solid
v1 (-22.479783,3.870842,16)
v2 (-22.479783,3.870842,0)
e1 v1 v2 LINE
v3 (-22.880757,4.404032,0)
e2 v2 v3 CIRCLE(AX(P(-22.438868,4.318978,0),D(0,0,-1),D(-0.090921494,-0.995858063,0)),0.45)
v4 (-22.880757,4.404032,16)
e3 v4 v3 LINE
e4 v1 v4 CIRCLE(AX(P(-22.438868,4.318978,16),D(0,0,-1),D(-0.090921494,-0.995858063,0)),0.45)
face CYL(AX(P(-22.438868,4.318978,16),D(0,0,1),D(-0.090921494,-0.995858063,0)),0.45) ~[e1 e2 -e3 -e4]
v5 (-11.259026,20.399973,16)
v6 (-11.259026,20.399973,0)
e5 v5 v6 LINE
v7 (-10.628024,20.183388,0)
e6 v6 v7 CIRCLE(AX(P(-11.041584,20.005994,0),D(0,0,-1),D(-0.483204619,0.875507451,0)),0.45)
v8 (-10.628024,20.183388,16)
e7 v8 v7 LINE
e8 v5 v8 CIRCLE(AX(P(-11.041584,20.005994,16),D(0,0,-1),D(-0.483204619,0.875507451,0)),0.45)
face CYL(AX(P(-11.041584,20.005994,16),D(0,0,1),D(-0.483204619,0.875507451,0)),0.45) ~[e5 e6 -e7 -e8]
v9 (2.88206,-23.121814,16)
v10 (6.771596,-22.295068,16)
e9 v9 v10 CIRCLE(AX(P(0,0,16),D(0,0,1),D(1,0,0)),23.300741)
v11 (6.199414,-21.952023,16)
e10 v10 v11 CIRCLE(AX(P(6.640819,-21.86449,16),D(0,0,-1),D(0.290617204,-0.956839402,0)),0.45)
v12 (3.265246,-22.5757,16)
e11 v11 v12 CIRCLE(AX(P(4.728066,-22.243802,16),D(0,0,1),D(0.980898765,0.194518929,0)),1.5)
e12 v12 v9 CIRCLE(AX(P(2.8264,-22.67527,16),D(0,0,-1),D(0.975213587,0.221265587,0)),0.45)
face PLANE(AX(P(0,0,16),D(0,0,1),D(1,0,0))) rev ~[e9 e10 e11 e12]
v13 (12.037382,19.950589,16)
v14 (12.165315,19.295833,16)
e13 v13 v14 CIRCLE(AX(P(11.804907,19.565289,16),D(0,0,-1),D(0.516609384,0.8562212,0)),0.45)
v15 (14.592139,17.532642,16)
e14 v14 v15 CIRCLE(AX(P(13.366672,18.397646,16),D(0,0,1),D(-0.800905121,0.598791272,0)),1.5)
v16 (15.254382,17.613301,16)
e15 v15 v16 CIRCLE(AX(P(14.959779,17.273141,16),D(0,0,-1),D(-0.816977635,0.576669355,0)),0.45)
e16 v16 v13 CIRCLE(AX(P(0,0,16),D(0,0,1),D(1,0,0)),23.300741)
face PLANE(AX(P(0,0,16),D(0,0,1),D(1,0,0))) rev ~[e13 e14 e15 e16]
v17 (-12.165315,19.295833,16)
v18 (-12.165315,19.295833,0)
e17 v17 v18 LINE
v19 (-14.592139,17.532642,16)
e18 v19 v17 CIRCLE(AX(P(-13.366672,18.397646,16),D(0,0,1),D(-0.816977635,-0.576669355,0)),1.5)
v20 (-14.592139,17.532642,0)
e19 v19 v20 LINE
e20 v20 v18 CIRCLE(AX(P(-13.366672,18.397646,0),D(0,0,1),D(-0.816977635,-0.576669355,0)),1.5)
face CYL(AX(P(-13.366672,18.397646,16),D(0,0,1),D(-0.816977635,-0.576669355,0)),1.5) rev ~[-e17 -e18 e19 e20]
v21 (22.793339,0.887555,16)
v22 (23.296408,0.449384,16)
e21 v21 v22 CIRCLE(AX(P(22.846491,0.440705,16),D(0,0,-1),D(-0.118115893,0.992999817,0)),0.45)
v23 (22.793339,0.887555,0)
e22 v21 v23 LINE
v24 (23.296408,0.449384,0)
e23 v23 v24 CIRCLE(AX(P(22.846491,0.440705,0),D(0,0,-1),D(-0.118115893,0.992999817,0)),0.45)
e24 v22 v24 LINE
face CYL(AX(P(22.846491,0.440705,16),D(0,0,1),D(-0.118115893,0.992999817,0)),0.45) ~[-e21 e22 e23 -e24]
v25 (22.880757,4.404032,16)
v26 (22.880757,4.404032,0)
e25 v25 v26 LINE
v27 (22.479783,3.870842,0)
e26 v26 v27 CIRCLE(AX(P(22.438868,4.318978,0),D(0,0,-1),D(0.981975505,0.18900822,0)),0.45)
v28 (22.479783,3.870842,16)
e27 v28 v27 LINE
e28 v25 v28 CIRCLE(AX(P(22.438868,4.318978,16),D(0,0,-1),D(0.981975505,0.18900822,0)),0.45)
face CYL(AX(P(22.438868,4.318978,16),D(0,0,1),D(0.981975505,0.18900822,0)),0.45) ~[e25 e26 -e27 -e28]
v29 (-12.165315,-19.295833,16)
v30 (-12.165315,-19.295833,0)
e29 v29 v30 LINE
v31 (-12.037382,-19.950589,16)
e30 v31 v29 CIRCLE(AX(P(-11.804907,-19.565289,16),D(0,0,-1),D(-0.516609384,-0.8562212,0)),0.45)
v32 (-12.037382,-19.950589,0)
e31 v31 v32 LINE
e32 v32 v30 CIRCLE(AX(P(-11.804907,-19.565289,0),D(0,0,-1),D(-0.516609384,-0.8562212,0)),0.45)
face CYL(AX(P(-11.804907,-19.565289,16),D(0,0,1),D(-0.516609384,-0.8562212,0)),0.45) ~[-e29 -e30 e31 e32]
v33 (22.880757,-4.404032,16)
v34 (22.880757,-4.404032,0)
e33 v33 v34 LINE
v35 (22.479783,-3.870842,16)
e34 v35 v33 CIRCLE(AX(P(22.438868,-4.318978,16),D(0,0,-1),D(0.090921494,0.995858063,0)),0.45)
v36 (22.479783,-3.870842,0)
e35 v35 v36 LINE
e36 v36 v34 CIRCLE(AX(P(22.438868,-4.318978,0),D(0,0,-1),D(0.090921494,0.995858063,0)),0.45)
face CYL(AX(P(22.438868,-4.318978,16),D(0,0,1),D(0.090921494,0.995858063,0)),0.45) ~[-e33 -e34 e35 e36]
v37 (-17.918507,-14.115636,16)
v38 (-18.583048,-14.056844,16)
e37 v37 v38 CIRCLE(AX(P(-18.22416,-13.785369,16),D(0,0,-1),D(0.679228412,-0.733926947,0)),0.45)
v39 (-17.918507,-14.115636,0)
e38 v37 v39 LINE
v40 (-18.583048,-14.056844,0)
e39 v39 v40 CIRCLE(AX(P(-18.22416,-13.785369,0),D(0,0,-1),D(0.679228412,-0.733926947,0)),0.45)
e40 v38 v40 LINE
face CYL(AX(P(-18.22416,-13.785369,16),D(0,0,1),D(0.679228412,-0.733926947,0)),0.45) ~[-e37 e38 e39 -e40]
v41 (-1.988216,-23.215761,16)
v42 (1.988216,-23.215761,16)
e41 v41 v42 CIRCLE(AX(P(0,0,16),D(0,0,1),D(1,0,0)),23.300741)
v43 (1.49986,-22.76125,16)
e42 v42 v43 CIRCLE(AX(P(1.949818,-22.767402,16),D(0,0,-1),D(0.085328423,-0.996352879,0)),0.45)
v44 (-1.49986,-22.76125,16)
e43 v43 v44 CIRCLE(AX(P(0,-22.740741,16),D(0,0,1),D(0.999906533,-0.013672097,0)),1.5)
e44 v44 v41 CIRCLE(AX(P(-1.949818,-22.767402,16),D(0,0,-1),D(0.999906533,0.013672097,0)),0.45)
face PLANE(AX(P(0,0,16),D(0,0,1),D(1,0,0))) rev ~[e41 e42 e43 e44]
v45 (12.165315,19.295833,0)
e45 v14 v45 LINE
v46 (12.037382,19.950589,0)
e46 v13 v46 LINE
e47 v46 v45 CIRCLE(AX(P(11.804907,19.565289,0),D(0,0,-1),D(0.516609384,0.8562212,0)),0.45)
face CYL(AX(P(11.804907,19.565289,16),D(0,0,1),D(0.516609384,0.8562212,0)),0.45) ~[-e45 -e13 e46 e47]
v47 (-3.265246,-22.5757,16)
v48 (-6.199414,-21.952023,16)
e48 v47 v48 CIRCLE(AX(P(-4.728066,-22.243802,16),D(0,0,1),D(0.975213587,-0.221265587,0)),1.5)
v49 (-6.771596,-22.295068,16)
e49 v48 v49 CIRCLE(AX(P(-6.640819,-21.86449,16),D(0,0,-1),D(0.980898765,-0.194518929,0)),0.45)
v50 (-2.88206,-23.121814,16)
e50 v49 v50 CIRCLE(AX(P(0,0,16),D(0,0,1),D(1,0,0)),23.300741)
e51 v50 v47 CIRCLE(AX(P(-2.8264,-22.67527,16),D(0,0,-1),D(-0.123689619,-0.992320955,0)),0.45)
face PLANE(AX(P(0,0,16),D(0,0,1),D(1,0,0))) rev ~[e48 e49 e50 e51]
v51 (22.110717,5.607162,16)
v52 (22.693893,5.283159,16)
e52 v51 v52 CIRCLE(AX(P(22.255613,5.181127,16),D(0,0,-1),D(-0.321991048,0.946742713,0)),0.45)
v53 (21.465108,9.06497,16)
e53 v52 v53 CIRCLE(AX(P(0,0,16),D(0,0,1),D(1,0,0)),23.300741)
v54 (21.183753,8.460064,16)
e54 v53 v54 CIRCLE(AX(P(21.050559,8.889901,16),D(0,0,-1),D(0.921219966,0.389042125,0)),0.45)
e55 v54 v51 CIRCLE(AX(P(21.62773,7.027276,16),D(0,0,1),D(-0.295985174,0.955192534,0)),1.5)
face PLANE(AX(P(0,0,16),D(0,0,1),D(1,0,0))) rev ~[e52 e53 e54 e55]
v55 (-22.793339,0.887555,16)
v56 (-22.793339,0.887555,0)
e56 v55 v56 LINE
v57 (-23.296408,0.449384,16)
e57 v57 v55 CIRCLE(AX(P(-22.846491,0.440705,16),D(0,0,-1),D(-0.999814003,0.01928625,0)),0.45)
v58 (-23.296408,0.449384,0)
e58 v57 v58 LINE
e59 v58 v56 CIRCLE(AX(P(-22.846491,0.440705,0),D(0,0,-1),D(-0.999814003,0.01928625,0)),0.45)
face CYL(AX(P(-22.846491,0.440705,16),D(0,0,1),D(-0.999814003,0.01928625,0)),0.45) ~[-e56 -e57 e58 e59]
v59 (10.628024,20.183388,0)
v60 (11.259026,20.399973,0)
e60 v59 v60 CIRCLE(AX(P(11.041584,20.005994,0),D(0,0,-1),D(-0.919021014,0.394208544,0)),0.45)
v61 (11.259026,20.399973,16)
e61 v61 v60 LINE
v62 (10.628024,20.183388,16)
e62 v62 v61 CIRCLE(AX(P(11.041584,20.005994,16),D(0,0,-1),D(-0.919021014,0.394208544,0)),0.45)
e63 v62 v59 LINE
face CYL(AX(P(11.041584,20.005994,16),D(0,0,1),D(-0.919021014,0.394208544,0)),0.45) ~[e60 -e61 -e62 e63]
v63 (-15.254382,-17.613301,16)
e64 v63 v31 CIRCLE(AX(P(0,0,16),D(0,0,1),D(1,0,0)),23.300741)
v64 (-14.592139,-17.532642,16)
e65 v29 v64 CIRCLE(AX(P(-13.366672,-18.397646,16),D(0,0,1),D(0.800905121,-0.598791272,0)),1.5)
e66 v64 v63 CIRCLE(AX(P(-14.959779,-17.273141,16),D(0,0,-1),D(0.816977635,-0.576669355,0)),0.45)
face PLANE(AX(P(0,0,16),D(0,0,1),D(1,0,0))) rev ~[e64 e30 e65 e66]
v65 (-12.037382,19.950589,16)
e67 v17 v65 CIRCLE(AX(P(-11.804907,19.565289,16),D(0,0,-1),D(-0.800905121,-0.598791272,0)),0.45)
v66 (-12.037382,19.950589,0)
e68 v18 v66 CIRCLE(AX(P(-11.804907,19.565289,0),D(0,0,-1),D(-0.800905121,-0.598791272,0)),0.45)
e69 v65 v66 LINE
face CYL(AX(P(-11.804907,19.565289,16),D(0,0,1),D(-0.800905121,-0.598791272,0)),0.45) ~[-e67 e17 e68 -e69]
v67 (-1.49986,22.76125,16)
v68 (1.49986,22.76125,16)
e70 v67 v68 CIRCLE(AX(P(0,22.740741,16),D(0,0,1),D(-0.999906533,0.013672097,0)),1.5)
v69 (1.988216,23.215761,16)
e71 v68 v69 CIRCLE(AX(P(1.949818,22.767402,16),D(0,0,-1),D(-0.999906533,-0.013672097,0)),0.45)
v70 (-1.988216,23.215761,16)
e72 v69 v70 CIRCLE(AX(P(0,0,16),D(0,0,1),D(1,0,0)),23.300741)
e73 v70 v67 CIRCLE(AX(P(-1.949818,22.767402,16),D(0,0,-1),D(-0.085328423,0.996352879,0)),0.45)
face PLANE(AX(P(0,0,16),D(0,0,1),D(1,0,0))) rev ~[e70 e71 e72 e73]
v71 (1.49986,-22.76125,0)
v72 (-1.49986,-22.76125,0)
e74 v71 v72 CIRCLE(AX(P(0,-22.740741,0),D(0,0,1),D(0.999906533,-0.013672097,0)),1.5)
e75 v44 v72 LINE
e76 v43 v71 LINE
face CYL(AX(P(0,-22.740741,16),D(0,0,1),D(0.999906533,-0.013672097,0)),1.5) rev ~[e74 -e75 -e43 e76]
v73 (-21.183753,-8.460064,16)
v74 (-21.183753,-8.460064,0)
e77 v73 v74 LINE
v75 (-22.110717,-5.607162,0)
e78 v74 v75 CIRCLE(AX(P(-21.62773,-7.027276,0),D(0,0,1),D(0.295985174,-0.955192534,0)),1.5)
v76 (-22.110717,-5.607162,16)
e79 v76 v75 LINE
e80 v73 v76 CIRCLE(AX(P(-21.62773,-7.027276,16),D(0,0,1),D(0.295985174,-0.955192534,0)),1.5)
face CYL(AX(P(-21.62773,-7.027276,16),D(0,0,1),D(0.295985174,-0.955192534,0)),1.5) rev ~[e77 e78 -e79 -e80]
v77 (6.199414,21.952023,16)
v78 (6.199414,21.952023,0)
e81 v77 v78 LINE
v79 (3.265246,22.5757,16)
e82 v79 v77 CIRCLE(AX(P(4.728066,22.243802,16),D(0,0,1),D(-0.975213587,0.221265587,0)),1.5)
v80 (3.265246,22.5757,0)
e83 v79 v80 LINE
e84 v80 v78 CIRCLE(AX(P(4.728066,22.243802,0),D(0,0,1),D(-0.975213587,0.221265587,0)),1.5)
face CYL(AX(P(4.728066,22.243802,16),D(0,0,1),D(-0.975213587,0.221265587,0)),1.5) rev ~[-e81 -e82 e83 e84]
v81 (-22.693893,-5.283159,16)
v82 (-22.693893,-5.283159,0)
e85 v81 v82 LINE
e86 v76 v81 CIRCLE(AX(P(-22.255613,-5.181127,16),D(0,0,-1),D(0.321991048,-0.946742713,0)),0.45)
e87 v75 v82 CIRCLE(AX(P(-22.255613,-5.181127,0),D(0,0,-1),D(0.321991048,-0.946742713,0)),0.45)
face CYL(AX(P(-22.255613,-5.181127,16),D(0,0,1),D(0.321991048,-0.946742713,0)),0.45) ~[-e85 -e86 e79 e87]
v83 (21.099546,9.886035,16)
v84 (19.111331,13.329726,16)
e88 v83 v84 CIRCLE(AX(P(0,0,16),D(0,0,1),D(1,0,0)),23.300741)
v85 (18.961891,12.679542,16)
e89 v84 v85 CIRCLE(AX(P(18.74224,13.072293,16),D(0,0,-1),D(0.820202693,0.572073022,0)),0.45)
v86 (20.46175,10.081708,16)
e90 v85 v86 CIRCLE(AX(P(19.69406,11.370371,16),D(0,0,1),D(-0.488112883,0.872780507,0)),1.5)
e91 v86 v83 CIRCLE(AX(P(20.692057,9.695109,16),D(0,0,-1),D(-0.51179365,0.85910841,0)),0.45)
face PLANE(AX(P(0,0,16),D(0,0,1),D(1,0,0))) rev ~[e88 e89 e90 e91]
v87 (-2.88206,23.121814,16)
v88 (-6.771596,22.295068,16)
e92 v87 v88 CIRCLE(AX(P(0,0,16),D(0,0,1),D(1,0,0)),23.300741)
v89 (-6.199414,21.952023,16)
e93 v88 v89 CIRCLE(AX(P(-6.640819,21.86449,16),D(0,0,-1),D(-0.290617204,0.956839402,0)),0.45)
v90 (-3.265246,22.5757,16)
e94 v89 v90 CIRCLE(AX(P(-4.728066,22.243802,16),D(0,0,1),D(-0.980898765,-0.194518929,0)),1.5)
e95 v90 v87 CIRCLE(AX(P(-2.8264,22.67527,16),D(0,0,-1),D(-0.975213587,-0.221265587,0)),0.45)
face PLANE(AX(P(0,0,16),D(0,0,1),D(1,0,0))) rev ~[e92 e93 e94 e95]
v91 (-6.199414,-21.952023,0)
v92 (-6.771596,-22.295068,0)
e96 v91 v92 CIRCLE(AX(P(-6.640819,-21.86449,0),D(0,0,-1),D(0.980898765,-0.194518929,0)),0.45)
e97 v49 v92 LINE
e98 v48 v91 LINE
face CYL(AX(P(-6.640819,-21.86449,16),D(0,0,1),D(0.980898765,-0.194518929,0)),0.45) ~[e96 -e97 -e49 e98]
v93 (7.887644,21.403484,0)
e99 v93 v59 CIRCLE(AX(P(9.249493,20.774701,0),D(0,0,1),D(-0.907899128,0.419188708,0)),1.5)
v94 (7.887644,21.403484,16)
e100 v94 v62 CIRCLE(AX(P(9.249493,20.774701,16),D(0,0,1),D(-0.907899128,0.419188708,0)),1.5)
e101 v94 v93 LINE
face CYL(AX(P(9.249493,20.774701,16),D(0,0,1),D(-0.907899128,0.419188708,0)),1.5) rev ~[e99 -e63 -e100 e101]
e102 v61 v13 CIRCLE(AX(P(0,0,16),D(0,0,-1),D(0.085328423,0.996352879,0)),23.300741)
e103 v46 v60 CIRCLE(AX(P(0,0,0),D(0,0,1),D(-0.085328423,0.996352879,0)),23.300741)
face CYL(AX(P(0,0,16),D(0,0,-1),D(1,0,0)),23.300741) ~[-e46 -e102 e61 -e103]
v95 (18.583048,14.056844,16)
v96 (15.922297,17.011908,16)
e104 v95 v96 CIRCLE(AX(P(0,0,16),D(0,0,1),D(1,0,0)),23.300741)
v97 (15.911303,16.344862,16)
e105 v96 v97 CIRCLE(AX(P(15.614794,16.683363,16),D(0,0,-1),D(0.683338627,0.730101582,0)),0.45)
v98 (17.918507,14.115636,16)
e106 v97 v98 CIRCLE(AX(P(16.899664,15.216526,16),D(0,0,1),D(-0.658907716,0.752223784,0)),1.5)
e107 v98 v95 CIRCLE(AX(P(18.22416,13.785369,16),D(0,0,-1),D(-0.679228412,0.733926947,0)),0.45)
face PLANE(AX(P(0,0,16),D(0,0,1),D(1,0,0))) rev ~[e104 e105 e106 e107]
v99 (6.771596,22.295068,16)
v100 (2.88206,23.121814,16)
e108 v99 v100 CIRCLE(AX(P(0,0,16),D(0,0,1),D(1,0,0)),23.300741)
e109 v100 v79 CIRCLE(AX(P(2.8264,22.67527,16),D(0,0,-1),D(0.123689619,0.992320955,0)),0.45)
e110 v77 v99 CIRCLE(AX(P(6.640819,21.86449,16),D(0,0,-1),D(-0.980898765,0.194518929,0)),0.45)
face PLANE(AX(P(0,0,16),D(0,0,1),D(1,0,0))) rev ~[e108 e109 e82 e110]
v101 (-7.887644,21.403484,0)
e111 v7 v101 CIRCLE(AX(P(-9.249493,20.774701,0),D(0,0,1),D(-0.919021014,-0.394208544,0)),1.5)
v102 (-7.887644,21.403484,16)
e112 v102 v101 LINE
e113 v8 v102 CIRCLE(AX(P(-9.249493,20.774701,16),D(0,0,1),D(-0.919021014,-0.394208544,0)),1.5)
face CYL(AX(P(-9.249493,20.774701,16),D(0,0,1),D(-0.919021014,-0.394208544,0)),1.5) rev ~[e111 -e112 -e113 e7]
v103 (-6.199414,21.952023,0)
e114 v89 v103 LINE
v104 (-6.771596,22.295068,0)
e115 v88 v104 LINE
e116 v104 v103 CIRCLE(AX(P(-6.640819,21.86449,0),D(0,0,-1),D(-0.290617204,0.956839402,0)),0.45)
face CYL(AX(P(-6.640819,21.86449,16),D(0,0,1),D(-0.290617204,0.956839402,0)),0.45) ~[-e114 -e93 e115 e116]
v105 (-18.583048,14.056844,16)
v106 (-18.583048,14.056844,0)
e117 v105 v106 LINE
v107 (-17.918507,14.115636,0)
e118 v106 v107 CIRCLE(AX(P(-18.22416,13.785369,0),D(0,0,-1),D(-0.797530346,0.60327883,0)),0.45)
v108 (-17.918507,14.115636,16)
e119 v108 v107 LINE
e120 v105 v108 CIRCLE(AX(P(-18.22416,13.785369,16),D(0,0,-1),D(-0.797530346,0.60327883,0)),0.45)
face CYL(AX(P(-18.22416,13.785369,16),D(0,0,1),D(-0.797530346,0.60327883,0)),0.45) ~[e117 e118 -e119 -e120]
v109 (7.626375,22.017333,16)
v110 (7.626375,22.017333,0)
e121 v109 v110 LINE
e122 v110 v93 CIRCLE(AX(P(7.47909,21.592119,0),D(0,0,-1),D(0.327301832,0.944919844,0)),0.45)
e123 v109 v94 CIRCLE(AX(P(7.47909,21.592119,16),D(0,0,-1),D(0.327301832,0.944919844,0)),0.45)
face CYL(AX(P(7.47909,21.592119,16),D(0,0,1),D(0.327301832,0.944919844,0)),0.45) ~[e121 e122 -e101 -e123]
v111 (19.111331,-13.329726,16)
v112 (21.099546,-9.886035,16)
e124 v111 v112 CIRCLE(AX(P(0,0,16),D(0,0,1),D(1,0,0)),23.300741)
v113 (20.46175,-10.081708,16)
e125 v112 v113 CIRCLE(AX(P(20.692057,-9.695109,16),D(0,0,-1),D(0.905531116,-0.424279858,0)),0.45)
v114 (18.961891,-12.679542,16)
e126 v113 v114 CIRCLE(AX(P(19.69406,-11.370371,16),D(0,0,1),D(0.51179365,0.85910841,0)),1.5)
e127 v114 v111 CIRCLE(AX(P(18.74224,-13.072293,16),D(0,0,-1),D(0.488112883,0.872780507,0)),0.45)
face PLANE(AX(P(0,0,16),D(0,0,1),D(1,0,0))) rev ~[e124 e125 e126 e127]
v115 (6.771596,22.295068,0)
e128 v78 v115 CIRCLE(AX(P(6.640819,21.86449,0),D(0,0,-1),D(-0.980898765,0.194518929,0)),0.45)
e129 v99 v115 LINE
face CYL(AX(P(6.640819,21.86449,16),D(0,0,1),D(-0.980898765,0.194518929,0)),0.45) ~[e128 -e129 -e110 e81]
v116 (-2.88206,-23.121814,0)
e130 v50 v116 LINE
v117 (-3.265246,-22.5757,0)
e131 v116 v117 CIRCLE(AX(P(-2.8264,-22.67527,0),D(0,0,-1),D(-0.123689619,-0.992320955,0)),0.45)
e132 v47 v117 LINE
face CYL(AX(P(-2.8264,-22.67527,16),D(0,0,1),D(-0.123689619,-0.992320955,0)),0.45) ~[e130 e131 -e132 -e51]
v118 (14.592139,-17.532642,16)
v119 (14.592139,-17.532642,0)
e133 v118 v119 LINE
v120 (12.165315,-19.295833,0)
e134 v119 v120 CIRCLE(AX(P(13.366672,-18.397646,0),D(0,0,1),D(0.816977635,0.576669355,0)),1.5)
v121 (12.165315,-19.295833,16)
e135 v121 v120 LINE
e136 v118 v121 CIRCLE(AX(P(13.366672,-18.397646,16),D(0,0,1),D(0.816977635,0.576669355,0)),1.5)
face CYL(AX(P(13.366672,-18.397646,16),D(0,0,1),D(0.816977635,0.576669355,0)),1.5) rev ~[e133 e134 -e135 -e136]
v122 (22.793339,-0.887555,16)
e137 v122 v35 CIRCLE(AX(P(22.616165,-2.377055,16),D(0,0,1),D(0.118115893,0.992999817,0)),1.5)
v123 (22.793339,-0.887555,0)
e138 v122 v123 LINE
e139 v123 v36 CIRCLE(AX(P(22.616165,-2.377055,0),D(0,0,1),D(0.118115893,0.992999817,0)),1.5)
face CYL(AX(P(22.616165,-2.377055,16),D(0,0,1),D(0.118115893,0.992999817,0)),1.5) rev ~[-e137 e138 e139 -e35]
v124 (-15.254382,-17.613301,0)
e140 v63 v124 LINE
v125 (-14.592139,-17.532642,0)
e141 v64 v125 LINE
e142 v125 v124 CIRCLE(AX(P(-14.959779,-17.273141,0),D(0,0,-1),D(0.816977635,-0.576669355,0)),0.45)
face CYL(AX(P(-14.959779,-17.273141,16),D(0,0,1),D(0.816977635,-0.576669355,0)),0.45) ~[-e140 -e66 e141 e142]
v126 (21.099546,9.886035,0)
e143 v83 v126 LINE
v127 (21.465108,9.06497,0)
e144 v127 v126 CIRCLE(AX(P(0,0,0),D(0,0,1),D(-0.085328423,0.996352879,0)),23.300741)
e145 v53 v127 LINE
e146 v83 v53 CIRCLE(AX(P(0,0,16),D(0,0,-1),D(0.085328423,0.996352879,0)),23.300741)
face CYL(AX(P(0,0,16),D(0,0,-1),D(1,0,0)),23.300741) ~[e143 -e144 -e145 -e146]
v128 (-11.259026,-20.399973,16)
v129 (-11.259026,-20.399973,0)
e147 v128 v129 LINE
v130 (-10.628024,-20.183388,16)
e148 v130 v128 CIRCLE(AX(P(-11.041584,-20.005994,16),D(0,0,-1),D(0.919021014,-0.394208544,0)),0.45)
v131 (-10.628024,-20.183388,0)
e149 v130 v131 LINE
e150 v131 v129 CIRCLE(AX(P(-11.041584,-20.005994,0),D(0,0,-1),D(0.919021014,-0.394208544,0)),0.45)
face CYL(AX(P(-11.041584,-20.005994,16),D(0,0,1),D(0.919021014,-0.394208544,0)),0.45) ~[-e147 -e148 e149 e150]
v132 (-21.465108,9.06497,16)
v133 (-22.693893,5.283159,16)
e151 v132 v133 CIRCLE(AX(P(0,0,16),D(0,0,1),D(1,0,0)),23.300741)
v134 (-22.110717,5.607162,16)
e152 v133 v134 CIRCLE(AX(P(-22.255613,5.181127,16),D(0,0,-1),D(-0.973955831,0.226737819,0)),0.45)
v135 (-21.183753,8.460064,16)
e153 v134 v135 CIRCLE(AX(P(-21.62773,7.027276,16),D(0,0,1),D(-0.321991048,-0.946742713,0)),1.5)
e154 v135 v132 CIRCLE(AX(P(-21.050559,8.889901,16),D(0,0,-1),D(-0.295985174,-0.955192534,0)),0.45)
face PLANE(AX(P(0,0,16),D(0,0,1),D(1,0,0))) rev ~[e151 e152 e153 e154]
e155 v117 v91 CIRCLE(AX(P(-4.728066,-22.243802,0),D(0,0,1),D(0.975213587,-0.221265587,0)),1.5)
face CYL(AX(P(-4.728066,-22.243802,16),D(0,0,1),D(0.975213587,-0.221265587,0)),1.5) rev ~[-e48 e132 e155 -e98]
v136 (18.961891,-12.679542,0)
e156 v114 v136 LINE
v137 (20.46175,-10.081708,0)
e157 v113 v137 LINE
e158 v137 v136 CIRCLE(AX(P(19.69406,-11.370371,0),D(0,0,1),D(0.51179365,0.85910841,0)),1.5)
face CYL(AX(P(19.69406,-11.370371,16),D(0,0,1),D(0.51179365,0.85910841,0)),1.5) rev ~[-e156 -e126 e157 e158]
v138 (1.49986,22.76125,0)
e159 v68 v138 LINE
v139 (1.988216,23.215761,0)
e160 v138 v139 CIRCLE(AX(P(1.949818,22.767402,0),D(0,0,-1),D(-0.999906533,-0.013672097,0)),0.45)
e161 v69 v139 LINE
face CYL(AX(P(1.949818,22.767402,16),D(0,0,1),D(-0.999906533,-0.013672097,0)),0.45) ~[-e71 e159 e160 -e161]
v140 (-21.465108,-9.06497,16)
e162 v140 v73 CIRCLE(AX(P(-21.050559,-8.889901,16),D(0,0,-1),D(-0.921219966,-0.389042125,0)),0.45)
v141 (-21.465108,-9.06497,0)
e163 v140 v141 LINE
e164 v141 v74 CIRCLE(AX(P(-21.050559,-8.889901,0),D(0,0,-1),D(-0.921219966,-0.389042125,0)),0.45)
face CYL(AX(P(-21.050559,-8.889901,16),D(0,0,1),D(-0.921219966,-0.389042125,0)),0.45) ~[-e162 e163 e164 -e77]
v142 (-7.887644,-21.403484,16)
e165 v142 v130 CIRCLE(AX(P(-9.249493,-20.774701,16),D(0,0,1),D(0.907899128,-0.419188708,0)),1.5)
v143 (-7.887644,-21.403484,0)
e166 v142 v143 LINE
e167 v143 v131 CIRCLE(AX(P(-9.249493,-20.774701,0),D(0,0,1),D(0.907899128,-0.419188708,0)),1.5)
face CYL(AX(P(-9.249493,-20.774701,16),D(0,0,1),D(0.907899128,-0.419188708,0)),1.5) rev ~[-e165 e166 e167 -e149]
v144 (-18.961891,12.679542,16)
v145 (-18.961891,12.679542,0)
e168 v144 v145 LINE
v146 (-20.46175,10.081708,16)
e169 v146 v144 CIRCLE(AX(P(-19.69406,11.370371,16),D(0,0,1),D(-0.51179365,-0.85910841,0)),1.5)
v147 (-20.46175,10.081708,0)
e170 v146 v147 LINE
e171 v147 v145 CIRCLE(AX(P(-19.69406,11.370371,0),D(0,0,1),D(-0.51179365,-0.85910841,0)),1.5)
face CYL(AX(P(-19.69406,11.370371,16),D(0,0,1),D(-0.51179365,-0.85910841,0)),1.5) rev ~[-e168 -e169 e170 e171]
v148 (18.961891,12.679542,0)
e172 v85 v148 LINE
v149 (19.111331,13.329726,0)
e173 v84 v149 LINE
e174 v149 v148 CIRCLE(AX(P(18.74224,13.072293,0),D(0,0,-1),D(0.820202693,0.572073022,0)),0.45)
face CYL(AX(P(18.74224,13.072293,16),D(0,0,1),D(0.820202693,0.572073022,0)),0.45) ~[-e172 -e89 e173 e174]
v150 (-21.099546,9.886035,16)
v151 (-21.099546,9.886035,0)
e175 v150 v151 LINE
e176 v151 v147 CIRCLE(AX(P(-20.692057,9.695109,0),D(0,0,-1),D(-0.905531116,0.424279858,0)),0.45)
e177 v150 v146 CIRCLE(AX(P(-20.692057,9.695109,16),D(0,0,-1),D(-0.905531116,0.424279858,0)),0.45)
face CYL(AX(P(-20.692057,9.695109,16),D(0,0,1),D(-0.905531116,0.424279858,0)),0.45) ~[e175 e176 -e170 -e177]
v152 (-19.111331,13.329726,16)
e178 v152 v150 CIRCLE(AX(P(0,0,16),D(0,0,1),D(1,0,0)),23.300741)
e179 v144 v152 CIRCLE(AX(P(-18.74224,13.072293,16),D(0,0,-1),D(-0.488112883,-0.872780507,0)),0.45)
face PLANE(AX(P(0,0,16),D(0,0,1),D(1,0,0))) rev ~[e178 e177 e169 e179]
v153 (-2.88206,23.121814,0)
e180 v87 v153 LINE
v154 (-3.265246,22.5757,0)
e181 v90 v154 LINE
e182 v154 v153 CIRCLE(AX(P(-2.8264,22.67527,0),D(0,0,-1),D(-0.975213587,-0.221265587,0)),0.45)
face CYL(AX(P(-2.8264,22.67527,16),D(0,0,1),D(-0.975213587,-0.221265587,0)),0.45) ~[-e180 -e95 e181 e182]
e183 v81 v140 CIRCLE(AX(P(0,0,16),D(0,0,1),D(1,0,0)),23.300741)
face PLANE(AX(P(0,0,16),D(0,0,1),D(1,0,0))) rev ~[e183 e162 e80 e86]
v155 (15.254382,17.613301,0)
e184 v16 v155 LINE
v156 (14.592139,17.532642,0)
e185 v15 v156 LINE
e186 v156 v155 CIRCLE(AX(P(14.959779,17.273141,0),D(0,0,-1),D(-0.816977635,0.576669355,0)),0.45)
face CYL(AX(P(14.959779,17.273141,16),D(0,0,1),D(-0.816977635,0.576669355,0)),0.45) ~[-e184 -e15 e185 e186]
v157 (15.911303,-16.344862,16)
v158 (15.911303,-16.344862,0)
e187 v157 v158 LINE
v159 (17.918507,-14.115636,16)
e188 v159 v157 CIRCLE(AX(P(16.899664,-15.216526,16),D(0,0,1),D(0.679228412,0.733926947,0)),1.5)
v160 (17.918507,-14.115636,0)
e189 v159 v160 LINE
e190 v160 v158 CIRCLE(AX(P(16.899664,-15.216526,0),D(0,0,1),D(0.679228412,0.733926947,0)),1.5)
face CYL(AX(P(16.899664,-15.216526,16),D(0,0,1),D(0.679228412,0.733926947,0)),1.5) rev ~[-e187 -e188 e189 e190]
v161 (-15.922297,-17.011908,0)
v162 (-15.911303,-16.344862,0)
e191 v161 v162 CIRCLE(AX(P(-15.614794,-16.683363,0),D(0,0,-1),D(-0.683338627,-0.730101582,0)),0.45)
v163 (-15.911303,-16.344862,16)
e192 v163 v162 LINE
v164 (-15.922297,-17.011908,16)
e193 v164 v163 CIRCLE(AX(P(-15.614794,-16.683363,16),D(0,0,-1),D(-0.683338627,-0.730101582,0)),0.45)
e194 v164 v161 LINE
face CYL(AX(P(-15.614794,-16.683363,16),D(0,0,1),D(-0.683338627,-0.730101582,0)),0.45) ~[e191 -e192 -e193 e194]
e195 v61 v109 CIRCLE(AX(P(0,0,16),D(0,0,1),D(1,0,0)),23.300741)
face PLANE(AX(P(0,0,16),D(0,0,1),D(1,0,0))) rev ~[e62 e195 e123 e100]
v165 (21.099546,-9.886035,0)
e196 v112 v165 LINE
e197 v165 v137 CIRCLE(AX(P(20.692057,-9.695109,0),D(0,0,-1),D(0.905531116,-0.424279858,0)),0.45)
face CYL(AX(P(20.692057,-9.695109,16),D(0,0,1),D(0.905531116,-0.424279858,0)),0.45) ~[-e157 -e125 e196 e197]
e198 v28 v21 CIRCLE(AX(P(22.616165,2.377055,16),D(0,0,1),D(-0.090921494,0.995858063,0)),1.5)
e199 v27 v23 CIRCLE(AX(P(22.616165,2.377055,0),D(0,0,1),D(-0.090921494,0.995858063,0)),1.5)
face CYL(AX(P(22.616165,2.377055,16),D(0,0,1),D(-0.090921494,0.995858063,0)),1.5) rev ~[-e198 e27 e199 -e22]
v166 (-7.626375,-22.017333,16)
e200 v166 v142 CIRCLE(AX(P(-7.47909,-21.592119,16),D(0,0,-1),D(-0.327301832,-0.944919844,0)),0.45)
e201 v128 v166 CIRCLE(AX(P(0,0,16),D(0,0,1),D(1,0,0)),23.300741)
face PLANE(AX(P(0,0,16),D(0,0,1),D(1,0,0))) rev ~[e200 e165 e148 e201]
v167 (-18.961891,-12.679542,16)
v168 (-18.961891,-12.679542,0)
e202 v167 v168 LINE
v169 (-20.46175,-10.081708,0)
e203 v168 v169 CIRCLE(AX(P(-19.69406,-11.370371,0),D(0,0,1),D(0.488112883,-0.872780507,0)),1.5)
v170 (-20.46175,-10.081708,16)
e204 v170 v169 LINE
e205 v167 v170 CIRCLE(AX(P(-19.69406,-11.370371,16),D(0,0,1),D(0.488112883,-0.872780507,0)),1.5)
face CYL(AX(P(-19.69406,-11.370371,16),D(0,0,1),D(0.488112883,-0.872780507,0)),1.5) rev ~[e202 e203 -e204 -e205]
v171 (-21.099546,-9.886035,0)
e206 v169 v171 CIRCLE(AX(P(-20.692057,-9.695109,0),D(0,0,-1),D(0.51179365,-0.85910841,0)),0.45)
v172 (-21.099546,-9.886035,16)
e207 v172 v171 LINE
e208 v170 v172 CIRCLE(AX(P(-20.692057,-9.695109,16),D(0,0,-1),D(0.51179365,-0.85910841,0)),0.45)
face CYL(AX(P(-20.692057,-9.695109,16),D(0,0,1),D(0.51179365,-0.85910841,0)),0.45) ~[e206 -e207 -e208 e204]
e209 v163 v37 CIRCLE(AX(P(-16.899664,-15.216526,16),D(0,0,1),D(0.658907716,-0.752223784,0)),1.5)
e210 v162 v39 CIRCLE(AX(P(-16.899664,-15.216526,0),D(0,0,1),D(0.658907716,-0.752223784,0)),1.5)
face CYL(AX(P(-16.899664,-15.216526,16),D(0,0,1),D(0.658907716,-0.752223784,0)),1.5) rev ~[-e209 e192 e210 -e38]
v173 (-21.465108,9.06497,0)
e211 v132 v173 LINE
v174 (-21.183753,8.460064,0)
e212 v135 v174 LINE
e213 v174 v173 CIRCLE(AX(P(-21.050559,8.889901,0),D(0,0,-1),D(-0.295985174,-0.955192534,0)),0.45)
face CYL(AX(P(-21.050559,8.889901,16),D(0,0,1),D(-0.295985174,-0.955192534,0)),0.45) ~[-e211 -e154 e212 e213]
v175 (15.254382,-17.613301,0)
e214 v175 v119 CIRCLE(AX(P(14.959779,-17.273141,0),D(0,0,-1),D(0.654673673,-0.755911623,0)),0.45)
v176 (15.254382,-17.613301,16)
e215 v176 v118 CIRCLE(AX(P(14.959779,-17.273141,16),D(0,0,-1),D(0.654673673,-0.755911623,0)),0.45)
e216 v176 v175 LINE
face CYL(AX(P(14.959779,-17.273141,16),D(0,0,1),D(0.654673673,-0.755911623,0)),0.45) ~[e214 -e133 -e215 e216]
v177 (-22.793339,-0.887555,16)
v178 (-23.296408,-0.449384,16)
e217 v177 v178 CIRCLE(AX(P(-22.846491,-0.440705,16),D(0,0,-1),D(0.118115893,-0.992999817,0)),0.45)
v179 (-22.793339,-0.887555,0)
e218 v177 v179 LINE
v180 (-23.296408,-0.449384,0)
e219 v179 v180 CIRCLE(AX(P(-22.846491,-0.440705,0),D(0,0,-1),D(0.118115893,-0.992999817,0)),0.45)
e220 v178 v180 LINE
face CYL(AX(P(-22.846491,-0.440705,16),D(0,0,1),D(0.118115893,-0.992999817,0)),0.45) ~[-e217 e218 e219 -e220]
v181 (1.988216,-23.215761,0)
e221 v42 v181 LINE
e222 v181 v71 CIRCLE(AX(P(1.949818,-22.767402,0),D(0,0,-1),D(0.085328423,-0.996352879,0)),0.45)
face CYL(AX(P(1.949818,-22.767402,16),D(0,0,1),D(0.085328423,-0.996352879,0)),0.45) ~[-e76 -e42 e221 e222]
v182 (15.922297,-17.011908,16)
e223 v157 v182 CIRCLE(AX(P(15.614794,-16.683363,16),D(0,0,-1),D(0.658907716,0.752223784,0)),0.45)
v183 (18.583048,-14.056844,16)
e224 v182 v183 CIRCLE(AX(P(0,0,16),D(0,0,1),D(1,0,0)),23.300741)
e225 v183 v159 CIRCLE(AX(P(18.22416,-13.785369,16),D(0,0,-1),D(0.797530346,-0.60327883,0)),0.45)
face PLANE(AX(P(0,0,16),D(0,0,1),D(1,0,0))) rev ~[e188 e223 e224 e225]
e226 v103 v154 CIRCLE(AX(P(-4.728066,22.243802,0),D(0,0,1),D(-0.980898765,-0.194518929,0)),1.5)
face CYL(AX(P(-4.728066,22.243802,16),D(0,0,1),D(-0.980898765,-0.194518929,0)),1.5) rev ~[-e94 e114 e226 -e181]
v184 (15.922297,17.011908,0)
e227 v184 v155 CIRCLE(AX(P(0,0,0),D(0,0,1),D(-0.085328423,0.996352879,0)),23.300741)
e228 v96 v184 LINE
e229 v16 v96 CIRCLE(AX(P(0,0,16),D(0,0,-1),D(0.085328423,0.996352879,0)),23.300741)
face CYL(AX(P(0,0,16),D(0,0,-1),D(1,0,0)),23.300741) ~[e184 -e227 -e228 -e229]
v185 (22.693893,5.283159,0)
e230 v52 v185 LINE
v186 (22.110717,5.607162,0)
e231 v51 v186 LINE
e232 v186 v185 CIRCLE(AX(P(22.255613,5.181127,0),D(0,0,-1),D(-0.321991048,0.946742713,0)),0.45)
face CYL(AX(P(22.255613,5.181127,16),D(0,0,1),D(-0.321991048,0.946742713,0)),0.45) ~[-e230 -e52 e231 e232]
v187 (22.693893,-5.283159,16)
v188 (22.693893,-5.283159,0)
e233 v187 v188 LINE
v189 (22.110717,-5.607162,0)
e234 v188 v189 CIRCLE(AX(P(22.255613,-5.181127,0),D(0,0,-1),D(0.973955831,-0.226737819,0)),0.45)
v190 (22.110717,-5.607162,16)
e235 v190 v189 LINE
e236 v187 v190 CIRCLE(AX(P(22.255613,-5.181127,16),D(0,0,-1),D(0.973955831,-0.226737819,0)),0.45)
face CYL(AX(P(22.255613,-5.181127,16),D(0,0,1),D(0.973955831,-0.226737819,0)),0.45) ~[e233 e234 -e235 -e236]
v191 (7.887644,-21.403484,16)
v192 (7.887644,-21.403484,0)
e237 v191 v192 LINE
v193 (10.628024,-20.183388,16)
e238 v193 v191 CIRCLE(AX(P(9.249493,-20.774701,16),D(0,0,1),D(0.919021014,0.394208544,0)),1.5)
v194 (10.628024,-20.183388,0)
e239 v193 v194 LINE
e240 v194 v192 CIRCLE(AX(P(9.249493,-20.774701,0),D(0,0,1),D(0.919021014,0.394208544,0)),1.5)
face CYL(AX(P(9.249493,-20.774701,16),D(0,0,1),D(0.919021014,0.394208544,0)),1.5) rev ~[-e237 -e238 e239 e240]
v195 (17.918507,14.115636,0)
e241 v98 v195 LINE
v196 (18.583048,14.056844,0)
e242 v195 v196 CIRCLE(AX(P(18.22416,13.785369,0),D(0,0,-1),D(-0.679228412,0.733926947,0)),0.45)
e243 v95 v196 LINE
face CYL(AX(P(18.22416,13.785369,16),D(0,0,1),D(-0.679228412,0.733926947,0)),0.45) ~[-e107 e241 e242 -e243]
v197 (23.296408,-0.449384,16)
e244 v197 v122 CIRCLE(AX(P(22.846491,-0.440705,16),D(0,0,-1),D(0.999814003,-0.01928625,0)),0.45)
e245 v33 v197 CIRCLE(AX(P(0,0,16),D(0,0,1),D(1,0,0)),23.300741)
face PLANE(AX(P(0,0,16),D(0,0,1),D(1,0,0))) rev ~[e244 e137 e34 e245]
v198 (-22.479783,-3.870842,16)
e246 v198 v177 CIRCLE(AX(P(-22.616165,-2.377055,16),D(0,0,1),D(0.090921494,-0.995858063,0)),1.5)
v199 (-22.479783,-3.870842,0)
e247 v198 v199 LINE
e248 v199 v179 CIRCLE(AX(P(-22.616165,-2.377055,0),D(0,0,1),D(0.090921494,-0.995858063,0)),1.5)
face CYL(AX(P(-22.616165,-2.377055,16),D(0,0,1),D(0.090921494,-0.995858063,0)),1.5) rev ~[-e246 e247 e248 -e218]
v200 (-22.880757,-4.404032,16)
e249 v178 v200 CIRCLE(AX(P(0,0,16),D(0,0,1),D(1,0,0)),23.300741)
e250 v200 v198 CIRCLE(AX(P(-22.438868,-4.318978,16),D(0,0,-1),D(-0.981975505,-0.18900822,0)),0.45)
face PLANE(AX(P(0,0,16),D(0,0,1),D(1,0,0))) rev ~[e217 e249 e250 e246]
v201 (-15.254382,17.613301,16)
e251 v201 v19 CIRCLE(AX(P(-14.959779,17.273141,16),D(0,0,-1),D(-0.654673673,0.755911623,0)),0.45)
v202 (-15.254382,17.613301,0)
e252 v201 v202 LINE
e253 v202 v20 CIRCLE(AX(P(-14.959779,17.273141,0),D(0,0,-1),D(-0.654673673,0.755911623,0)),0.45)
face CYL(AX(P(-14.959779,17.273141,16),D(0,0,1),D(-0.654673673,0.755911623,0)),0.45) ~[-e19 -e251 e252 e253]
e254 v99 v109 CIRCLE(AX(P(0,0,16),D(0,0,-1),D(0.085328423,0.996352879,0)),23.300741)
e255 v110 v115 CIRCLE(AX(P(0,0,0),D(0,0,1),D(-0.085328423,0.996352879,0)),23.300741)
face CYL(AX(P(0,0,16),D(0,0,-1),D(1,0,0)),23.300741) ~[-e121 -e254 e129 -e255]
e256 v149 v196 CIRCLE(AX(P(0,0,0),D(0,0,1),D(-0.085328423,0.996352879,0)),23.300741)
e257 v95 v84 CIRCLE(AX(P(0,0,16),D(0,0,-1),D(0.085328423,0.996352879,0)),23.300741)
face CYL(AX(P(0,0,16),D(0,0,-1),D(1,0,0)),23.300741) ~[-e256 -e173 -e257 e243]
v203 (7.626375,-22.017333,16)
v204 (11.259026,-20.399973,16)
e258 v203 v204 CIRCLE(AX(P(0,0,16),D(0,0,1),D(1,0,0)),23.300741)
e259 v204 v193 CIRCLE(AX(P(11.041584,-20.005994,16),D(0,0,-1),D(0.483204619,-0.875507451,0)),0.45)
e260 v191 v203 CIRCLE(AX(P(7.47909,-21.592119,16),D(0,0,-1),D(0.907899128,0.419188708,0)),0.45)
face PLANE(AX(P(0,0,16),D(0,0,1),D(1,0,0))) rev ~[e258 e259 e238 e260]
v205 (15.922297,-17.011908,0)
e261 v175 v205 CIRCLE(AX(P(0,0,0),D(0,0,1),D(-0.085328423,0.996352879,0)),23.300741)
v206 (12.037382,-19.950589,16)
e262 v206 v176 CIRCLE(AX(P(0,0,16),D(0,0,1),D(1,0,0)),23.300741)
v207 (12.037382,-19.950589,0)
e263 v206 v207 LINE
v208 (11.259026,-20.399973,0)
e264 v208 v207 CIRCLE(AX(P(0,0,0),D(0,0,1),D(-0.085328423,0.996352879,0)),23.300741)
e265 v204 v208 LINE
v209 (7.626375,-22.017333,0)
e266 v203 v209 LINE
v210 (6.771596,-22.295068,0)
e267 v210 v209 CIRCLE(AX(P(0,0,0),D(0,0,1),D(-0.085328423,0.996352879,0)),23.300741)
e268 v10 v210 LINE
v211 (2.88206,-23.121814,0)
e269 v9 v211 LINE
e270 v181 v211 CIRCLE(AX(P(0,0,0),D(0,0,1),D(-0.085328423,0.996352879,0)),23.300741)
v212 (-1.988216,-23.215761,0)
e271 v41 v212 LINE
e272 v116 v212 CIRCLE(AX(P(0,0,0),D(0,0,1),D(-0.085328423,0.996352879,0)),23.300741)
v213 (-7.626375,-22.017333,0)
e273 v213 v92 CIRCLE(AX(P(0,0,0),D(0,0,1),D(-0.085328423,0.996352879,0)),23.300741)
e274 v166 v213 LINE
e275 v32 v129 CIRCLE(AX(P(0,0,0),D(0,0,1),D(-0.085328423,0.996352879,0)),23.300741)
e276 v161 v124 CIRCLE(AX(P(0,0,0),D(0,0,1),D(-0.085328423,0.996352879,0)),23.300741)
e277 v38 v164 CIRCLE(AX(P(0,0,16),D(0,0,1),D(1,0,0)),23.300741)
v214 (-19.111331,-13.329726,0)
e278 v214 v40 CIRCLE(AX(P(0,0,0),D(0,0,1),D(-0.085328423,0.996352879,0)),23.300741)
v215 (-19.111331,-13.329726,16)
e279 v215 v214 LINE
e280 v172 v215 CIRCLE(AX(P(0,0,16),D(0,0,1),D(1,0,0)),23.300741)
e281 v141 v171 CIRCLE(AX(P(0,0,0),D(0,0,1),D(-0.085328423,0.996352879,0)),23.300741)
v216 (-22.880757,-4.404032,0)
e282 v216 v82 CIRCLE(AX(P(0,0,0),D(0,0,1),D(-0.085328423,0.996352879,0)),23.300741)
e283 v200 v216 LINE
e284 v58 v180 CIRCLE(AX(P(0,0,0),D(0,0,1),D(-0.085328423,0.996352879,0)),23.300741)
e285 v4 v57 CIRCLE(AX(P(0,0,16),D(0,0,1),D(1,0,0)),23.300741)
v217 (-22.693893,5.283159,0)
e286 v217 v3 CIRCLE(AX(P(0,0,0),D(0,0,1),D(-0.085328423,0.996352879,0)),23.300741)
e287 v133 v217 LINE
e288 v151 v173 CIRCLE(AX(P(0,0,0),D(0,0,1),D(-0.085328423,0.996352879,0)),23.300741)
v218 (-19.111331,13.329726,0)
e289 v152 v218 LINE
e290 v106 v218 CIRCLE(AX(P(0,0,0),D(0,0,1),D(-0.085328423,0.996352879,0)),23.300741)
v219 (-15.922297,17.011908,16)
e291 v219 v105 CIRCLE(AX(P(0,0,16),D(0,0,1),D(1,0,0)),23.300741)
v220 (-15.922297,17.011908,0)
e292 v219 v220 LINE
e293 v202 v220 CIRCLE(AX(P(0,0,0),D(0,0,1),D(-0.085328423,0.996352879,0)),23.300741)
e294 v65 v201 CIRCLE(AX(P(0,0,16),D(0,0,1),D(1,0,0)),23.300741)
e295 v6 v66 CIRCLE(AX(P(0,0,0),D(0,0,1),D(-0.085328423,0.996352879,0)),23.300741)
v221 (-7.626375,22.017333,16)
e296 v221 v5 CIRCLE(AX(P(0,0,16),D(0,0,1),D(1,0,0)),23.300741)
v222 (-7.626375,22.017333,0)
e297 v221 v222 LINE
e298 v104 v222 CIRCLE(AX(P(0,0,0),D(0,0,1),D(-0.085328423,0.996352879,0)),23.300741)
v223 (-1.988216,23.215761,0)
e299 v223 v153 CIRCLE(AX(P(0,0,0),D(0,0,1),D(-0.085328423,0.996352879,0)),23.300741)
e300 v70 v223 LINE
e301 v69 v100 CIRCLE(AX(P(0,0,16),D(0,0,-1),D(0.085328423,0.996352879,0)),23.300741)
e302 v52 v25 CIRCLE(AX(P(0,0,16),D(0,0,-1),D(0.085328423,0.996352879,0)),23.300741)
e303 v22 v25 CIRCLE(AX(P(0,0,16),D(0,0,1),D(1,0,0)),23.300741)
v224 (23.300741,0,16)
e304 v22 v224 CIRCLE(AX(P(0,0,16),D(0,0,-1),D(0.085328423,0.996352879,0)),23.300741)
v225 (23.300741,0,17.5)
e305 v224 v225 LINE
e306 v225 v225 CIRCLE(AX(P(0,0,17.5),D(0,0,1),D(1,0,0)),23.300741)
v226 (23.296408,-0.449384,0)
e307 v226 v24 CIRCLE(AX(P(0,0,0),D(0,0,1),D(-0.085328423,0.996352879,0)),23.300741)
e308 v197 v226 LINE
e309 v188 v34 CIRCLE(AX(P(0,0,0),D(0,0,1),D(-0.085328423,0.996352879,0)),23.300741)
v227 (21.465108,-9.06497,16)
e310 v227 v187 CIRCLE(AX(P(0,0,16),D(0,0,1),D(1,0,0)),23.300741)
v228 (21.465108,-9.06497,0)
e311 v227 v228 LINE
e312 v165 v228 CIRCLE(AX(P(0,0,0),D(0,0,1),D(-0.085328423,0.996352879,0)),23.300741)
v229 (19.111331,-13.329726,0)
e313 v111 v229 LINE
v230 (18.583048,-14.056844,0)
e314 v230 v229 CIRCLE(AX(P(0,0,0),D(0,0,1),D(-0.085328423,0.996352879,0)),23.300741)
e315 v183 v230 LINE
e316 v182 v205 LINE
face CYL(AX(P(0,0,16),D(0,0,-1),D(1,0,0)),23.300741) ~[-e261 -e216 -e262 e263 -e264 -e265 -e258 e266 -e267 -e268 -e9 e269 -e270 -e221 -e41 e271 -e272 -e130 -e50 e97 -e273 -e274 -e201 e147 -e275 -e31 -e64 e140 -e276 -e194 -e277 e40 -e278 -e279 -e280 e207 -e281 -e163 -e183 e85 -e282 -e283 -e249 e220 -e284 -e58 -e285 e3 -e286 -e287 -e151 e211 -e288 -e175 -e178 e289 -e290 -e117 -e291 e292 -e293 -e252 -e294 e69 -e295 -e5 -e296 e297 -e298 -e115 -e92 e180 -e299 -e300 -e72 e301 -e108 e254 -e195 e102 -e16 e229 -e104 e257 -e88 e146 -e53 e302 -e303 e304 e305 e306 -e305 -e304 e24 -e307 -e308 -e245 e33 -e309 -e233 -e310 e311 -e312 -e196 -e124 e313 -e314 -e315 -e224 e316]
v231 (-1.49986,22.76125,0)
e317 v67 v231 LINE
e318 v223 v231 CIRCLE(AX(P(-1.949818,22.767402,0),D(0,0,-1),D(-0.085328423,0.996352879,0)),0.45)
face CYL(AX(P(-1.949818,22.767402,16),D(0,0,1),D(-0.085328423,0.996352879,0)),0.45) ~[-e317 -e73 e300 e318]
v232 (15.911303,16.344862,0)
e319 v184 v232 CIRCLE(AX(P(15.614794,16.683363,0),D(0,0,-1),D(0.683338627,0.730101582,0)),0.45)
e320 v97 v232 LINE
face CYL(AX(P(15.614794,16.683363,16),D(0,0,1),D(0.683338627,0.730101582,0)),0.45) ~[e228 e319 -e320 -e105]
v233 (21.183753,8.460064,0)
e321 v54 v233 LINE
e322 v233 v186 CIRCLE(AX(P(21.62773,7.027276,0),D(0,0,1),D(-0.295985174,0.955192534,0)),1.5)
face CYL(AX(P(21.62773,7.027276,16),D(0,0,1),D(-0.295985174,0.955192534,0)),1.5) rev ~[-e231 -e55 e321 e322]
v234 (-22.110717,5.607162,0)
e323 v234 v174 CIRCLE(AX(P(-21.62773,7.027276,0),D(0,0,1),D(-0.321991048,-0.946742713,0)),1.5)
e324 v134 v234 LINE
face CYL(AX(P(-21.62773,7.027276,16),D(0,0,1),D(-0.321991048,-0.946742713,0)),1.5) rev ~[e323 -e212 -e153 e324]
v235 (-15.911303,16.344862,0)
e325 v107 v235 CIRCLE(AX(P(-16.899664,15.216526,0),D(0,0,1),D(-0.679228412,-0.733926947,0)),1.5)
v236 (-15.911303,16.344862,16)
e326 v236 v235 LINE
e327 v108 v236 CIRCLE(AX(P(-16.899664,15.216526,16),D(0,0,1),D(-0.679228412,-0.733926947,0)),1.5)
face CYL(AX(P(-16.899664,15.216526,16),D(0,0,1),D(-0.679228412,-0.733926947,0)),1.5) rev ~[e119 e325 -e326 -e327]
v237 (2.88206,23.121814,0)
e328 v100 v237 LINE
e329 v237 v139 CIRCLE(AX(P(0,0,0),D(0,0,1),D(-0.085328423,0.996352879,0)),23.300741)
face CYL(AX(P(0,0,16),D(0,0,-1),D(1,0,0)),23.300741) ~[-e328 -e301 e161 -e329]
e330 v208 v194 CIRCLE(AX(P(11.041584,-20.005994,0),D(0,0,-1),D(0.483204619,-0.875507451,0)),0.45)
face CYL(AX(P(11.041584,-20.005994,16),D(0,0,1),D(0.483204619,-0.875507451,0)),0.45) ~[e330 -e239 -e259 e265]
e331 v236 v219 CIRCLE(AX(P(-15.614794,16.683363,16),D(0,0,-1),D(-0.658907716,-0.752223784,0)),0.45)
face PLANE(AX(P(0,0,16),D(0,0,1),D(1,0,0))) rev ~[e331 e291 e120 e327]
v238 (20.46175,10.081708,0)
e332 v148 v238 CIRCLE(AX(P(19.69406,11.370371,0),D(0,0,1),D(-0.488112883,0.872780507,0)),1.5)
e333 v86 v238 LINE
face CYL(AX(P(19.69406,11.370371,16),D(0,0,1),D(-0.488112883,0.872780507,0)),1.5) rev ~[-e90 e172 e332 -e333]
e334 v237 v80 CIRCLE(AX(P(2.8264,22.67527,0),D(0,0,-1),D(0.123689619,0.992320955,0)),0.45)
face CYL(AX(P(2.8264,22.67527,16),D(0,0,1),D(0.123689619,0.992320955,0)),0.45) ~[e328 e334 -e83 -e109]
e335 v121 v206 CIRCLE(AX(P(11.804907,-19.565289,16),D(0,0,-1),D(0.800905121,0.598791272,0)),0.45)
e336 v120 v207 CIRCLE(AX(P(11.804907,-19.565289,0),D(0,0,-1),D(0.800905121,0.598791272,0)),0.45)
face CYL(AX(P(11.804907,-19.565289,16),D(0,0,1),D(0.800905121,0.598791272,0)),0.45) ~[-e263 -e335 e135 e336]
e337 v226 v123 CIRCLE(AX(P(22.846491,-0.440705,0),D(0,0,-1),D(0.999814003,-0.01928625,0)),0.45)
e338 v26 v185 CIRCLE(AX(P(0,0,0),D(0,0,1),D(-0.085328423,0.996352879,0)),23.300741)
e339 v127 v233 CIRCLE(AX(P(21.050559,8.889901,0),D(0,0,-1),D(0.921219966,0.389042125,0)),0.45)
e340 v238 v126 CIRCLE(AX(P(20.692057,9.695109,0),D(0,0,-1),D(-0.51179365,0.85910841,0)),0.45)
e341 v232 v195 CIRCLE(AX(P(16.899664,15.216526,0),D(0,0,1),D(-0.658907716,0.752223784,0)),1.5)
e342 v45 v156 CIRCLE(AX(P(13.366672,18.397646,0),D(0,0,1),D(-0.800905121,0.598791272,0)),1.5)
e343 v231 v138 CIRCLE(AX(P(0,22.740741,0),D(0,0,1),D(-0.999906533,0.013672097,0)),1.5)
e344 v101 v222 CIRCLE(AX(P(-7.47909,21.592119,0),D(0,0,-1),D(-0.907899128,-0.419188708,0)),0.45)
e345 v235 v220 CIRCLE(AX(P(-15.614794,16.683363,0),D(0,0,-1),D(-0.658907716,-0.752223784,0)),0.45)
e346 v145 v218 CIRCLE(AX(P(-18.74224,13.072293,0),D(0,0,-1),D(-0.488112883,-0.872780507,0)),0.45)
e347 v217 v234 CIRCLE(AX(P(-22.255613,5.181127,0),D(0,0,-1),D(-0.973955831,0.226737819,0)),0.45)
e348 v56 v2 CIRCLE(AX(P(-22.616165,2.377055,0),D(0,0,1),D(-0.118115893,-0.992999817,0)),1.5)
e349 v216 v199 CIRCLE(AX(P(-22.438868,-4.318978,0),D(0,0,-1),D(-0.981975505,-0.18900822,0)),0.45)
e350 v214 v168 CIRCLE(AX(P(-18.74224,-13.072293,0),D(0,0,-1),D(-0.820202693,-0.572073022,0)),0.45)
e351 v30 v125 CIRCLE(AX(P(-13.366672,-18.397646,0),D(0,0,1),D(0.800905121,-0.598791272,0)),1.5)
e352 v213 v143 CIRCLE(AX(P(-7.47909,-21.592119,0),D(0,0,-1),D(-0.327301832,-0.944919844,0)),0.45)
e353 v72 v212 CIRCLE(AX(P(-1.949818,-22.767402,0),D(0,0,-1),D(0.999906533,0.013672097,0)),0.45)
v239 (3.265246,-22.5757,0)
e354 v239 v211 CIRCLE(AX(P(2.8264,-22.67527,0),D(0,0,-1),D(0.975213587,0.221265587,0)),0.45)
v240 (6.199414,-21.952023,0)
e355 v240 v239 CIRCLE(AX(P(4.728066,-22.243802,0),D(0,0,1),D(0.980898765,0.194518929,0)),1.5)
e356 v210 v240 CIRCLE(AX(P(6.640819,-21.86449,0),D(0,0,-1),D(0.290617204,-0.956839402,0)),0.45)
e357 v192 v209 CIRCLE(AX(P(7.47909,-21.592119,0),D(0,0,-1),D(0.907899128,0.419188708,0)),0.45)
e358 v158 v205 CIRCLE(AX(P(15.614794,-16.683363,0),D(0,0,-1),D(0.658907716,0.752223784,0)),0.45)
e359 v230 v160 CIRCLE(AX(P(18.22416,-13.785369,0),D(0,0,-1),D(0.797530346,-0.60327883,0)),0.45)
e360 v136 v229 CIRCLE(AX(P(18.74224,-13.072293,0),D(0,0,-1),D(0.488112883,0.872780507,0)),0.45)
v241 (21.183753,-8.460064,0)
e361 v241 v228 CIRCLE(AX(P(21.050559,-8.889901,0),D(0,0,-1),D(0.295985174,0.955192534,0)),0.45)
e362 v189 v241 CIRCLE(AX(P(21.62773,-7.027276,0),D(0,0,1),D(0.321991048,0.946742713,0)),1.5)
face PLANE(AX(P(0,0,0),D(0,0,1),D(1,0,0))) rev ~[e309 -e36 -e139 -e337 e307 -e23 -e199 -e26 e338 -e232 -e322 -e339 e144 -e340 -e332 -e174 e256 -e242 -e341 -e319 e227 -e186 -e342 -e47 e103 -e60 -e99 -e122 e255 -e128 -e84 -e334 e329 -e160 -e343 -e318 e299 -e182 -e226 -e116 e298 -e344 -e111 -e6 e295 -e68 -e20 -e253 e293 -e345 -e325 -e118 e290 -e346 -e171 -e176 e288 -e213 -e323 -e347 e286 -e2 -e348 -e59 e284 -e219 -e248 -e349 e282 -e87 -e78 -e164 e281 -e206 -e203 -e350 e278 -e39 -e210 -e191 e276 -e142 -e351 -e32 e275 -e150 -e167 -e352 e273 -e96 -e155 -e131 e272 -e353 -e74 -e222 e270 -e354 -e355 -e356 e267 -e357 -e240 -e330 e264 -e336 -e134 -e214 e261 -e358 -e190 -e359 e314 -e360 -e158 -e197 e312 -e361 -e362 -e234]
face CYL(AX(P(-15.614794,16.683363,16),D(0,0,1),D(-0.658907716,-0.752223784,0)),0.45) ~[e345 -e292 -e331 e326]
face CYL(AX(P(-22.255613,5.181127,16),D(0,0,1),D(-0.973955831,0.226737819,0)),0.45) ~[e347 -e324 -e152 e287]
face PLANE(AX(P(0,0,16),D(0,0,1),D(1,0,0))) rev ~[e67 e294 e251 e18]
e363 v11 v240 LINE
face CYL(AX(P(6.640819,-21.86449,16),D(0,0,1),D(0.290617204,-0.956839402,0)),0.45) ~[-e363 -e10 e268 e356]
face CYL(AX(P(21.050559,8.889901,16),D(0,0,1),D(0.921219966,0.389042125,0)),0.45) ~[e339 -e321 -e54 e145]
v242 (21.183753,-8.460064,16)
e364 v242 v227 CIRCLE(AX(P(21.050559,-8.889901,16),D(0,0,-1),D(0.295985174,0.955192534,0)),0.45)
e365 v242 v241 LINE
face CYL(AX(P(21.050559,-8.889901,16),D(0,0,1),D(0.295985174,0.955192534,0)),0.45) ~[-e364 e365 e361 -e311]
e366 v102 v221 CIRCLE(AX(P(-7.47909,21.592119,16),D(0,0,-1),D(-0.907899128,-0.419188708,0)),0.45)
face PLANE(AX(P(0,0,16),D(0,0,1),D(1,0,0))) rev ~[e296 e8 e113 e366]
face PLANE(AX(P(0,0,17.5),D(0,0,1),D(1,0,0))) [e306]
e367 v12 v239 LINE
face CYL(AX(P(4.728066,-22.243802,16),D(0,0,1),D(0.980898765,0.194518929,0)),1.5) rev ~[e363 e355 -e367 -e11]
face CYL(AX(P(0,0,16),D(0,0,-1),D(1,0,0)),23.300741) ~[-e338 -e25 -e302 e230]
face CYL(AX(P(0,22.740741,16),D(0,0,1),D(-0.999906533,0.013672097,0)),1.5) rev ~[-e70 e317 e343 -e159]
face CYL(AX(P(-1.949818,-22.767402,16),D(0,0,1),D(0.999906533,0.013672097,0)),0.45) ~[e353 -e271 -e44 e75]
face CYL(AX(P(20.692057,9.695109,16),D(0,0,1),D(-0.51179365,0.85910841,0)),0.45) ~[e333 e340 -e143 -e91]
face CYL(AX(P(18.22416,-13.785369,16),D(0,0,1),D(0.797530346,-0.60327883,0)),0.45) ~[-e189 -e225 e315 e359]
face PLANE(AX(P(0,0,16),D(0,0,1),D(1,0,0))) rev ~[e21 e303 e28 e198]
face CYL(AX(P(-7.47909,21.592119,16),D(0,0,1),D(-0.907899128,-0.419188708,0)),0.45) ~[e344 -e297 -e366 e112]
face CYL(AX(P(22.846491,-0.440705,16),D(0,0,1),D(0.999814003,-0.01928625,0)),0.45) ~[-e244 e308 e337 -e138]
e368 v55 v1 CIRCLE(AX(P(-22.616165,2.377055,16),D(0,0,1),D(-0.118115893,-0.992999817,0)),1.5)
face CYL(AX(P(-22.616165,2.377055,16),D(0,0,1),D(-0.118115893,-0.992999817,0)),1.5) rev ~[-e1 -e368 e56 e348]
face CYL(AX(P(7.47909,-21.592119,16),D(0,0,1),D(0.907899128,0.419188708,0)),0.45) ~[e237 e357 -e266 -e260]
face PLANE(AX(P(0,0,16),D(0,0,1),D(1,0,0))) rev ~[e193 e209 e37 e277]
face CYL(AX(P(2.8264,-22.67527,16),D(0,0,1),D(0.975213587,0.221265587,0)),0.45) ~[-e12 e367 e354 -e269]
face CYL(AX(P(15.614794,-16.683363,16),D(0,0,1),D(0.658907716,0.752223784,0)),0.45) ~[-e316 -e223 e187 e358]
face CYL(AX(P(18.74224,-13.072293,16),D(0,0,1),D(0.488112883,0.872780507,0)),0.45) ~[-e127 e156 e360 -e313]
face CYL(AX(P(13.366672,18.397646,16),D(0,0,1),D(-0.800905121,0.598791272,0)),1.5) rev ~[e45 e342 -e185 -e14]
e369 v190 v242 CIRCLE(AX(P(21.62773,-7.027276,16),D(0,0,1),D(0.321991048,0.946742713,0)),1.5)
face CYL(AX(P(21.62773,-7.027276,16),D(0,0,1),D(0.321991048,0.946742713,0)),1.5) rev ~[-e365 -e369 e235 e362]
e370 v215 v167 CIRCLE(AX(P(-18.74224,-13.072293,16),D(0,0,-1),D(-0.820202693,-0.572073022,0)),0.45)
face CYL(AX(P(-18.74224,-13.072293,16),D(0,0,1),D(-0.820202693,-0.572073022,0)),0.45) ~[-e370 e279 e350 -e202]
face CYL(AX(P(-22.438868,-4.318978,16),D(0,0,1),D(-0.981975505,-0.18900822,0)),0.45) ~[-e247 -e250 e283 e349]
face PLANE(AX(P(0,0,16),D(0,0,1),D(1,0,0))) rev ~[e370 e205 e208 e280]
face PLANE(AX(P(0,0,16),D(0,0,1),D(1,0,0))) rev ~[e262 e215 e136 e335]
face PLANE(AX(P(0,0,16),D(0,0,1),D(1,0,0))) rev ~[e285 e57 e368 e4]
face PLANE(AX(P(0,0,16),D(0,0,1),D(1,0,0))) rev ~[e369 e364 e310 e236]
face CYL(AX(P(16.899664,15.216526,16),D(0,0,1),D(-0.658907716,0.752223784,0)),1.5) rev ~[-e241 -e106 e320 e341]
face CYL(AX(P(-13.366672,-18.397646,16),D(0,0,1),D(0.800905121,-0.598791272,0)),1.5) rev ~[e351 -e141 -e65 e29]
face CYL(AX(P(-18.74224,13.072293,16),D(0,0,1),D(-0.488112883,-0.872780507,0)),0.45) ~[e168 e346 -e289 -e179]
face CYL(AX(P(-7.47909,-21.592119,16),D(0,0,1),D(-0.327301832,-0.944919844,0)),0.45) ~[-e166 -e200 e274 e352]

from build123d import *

# Parameters (mm, degrees)
F2_R            = 23.3007414911
F3_DEPTH        = 16
F5_DEPTH        = 16
F5_COPIES_COUNT = 30
F7_R            = 23.3007414911
F8_DEPTH        = 1.5


# Not quite as in the source:
# - a feature of the source that left no trace in its solid (it failed there, or was rolled back) is left out
# - a pattern or mirror of a feature is missing from the dataset's text; its kind, count and spacing are read off the source's solid


with BuildPart() as f3:
    # F2 (on Top) → F3 (new body)
    with BuildSketch(Plane.XY):
        Circle(F2_R)
    extrude(amount=F3_DEPTH)

    # F4 (on face) → F5 (cut, through all)
    with BuildSketch(Plane.XY.offset(16)):
        with BuildLine():
            ThreePointArc((-1.9882155288, 23.2157608758), (-1.6432389463, 23.0968097974), (-1.4998597988, 22.7612496365))
            ThreePointArc((-1.4998597988, 22.7612496365), (0, 21.2407414911), (1.4998597988, 22.7612496365))
            ThreePointArc((1.4998597988, 22.7612496365), (1.6432389463, 23.0968097974), (1.9882155288, 23.2157608758))
            ThreePointArc((1.9882155288, 23.2157608758), (0, 23.3007414911), (-1.9882155288, 23.2157608758))
        make_face()
    f5 = extrude(amount=-F5_DEPTH, mode=Mode.SUBTRACT)

    # F5_copies: F5 ×30 about axis
    f5_copies_axis = Axis((0, 0, 0), (0, 0, 1))
    for i in range(1, F5_COPIES_COUNT):
        add(f5.rotate(f5_copies_axis, i * 360 / F5_COPIES_COUNT), mode=Mode.SUBTRACT)

    # F7 (on face) → F8 (join)
    with BuildSketch(Plane.XY.offset(16)):
        Circle(F7_R)
    extrude(amount=F8_DEPTH)


solid = f3.part
